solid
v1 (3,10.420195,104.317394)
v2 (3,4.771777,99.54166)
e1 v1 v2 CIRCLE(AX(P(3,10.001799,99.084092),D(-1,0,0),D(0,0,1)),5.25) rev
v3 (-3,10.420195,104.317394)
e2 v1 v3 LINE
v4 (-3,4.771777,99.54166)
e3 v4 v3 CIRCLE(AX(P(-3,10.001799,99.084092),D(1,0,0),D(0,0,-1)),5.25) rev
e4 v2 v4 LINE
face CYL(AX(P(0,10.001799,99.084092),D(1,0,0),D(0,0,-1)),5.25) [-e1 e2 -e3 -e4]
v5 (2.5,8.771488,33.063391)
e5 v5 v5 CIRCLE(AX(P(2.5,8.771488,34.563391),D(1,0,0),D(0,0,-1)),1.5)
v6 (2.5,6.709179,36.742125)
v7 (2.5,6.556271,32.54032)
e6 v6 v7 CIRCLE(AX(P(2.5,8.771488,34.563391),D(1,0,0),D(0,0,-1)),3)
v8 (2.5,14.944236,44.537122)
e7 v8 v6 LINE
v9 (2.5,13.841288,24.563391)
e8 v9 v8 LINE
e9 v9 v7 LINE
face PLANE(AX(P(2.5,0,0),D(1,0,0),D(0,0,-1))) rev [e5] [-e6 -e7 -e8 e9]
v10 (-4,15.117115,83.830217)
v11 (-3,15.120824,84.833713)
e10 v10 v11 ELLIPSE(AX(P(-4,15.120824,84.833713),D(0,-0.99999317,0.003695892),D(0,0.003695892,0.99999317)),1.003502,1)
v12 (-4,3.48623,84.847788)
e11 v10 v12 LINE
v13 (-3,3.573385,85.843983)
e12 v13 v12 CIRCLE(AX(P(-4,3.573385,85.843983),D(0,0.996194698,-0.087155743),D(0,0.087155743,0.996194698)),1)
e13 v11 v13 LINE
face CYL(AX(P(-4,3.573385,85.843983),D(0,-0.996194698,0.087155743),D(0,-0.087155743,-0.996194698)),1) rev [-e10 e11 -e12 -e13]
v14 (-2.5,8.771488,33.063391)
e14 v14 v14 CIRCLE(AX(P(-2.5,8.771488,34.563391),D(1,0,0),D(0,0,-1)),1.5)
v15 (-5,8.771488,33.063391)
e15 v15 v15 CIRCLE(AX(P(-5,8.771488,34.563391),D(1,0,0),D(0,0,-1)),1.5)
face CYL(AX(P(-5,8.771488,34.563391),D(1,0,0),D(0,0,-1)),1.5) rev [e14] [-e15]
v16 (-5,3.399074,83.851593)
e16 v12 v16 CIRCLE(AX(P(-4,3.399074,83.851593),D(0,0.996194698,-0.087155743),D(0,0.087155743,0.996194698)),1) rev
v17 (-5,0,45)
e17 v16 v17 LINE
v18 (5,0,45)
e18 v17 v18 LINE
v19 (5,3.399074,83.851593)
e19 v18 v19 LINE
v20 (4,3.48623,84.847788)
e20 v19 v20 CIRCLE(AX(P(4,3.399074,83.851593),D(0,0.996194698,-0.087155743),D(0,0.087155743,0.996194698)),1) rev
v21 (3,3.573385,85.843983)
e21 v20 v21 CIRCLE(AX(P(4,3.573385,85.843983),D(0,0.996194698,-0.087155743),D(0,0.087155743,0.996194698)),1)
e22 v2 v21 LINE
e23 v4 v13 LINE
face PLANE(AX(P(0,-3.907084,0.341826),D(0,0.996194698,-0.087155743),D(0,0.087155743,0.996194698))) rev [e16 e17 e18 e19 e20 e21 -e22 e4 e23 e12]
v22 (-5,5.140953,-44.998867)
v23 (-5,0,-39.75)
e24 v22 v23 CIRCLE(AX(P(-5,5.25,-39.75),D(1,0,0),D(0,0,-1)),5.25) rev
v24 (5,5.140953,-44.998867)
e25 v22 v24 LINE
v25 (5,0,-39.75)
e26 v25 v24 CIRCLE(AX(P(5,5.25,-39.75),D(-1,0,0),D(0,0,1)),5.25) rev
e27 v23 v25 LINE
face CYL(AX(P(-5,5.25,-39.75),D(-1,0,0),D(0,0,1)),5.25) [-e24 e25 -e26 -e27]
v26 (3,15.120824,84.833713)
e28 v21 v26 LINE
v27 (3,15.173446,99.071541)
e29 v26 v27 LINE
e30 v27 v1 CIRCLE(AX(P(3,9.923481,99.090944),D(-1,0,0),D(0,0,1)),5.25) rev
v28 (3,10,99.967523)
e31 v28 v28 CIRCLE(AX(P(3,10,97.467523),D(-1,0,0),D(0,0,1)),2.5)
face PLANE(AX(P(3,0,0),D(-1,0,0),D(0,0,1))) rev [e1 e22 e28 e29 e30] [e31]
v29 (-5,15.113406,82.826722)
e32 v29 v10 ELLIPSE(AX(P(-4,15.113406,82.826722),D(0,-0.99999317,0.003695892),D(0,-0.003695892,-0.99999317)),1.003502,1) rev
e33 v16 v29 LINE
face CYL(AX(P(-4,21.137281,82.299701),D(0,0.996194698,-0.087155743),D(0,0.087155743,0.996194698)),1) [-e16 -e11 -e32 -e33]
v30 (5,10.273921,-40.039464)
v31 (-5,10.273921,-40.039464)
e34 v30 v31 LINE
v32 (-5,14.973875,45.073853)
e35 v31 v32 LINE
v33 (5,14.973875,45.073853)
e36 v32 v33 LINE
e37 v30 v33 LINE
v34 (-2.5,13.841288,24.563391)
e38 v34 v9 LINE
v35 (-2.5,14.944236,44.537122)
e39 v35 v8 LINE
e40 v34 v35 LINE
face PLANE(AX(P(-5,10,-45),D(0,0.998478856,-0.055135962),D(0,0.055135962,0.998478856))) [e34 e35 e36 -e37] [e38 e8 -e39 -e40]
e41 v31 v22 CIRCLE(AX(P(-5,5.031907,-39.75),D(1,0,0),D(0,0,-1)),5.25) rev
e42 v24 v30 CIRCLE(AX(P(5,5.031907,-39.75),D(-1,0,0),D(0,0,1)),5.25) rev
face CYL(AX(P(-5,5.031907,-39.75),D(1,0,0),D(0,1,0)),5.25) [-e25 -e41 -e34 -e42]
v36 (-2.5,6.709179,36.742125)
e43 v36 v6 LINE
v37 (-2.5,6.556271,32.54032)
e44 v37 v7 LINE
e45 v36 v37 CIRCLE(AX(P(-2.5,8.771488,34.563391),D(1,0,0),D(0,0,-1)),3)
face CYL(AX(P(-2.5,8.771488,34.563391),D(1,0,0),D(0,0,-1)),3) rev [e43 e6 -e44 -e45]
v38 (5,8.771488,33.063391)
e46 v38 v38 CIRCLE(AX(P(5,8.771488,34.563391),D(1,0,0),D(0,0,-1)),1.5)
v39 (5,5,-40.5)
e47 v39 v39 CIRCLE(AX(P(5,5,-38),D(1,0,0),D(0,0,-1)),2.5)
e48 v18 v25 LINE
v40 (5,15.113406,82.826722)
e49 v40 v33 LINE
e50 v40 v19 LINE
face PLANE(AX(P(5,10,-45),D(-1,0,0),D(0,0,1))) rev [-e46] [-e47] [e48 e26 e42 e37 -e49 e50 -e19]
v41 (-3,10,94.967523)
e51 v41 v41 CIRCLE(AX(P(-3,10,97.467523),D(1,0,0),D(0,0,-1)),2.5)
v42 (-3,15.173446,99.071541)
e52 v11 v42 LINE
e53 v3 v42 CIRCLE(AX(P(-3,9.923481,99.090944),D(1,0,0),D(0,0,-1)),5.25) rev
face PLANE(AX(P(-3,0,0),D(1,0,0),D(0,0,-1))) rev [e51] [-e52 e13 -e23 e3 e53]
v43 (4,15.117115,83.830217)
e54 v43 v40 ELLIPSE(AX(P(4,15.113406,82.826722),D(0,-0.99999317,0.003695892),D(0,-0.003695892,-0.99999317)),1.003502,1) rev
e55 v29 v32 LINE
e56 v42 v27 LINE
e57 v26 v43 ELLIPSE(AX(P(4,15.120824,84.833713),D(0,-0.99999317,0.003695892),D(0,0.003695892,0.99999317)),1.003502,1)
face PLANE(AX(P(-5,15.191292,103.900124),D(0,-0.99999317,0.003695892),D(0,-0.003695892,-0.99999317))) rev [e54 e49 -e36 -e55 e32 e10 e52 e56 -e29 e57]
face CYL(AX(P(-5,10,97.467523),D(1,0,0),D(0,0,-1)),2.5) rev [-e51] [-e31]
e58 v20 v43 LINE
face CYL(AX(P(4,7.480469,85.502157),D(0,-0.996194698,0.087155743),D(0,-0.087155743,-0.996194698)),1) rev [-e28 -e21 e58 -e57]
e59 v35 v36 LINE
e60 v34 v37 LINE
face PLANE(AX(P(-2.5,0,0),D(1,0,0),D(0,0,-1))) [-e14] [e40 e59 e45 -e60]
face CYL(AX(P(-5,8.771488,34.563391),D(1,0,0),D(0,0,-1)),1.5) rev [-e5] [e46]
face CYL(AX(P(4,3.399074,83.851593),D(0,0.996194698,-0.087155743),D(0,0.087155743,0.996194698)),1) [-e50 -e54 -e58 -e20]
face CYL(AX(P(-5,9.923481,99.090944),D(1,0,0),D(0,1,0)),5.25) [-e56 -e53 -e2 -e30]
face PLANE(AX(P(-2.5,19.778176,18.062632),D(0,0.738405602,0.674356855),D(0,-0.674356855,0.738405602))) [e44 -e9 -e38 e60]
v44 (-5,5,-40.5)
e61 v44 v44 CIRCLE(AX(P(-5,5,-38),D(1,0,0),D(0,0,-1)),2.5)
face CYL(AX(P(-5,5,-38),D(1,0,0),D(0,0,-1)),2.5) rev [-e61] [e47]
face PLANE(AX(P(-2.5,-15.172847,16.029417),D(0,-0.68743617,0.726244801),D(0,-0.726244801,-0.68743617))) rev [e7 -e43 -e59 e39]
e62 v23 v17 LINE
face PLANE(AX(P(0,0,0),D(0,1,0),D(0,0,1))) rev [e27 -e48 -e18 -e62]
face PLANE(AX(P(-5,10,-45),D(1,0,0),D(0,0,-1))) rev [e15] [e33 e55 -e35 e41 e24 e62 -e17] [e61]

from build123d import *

# Parameters (mm, degrees)
SKETCH2_W           = 10
SKETCH2_H           = 90
BOSS_EXTRUDE1_DEPTH = 10
SKETCH3_W           = 10
SKETCH3_H           = 60
BOSS_EXTRUDE2_DEPTH = 10
BOSS_EXTRUDE3_DEPTH = 10
CUT_EXTRUDE5_START  = -8
CUT_EXTRUDE5_DEPTH  = 2
CUT_EXTRUDE6_DEPTH  = 2
SKETCH4_3_R         = 2.5
CUT_EXTRUDE1_DEPTH  = 10
CUT_EXTRUDE2_START  = -2.5
SKETCH4_5_R         = 1.5
CUT_EXTRUDE2_DEPTH  = 5
CUT_EXTRUDE3_DEPTH  = 107.338519192
FILLET3_R           = 5.25
FILLET4_R           = 5.25
SKETCH4_7_R         = 2.5
CUT_EXTRUDE4_DEPTH  = 106.904850242
FILLET5_R           = 1


# Some blends are built 0.0001 mm under size
with BuildPart() as part:
    # Sketch2 → Boss-Extrude1 (new body)
    with BuildSketch(Plane(origin=(0, 0, 0), x_dir=(1, 0, 0), z_dir=(0, 1, 0))):
        Rectangle(SKETCH2_W, SKETCH2_H)
    extrude(amount=BOSS_EXTRUDE1_DEPTH)

    # Sketch3 → Boss-Extrude2 (add)
    with BuildSketch(Plane(origin=(0, -3.907083998, 0.341825557), x_dir=(1, 0, 0), z_dir=(0, -0.9961946980917459, 0.08715574274765504))):
        with Locations((0, 74.828761414)):
            Rectangle(SKETCH3_W, SKETCH3_H)
    extrude(amount=-BOSS_EXTRUDE2_DEPTH)

    # Sketch4 → Boss-Extrude3 (add)
    with BuildSketch(Plane(origin=(5, 0, 0), x_dir=(0, 0, -1), z_dir=(1, 0, 0))):
        Polygon((-103.900124458, 15.191291546), (-44.563390571, 10), (45, 10), (-45.073853215, 14.973874535), align=None)
    extrude(amount=-BOSS_EXTRUDE3_DEPTH)

    # Sketch6 → Cut-Extrude5 (cut)
    with BuildSketch(Plane(origin=(5, 0, 0), x_dir=(0, 0, -1), z_dir=(1, 0, 0)).offset(CUT_EXTRUDE5_START)):
        Polygon((-103.900124458, 15.191291546), (-104.771681886, 5.229344565), (-84.847787924, 3.48622971), (-83.830217328, 15.117114837), align=None)
    extrude(amount=-CUT_EXTRUDE5_DEPTH, mode=Mode.SUBTRACT)

    # Sketch6<2> → Cut-Extrude6 (cut)
    with BuildSketch(Plane(origin=(5, 0, 0), x_dir=(0, 0, -1), z_dir=(1, 0, 0))):
        Polygon((-103.900124458, 15.191291546), (-104.771681886, 5.229344565), (-84.847787924, 3.48622971), (-83.830217328, 15.117114837), align=None)
    extrude(amount=-CUT_EXTRUDE6_DEPTH, mode=Mode.SUBTRACT)

    # Sketch4<3> → Cut-Extrude1 (cut)
    with BuildSketch(Plane(origin=(5, 0, 0), x_dir=(0, 0, -1), z_dir=(1, 0, 0))):
        with Locations((-97.467522719, 10)):
            Circle(SKETCH4_3_R)
    extrude(amount=-CUT_EXTRUDE1_DEPTH, mode=Mode.SUBTRACT)

    # Sketch4<5> → Cut-Extrude2 (cut)
    with BuildSketch(Plane(origin=(5, 0, 0), x_dir=(0, 0, -1), z_dir=(1, 0, 0)).offset(CUT_EXTRUDE2_START)):
        with BuildLine():
            Line((-44.537121893, 14.944236253), (-36.742124975, 6.709179338))
            ThreePointArc((-36.742124975, 6.709179338), (-34.672491645, 5.773472347), (-32.540320007, 6.556271045))
            Line((-32.540320007, 6.556271045), (-24.563390571, 13.841287616))
            Line((-24.563390571, 13.841287616), (-44.537121893, 14.944236253))
        make_face()
        with Locations((-34.563390571, 8.77148785)):
            Circle(SKETCH4_5_R, mode=Mode.SUBTRACT)
    extrude(amount=-CUT_EXTRUDE2_DEPTH, mode=Mode.SUBTRACT)

    # Sketch4<6> → Cut-Extrude3 (cut, through all)
    with BuildSketch(Plane(origin=(5, 0, 0), x_dir=(0, 0, -1), z_dir=(1, 0, 0))):
        with BuildLine():
            ThreePointArc((-33.702717638, 10), (-34.563390571, 10.27148785), (-35.424063503, 10))
            Line((-35.424063503, 10), (-33.702717638, 10))
        make_face()
        with BuildLine():
            Line((-33.702717638, 10), (-35.424063503, 10))
            ThreePointArc((-35.424063503, 10), (-35.255846563, 7.440884716), (-33.063390571, 8.77148785))
            ThreePointArc((-33.063390571, 8.77148785), (-33.232787437, 9.463943842), (-33.702717638, 10))
        make_face()
    extrude(amount=-CUT_EXTRUDE3_DEPTH, mode=Mode.SUBTRACT)

    # Fillet3
    # the kernel refuses this fillet: 5.25 mm, written as the material it takes off along each edge
    with BuildSketch(Plane(origin=(16.125, 5.229344565, 104.771681886), x_dir=(0, -0.08715574274765522, -0.9961946980917458), z_dir=(-1, 0, 0))) as fillet3_piece_1:
        with BuildLine():
            CenterArc((FILLET3_R, -FILLET3_R), FILLET3_R, 90, 90)
            Line((0, -FILLET3_R), (0, 0))
            Line((0, 0), (FILLET3_R, 0))
        make_face()
    extrude(amount=32.25, mode=Mode.SUBTRACT)
    with BuildSketch(Plane(origin=(15.07154221, 15.191291546, 103.900124458), x_dir=(0, -0.003695891671652919, -0.9999931701690523), z_dir=(-1, 0, 0))) as fillet3_piece_2:
        with BuildLine():
            CenterArc((FILLET3_R * 0.91973654932, FILLET3_R), FILLET3_R, 184.788240524, 85.211759476)
            Line((-FILLET3_R * 0.0767734631138, FILLET3_R * 0.916526680199), (0, 0))
            Line((0, 0), (FILLET3_R * 0.91973654932, 0))
        make_face()
    extrude(amount=30.14308442, mode=Mode.SUBTRACT)

    # Fillet4
    # the kernel refuses this fillet: 5.25 mm, written as the material it takes off along each edge
    with BuildSketch(Plane(origin=(-18.125, 0, -45), x_dir=(0, 1, 0), z_dir=(1, 0, 0))) as fillet4_piece_1:
        with BuildLine():
            CenterArc((FILLET4_R, FILLET4_R), FILLET4_R, 180, 90)
            Line((0, FILLET4_R), (0, 0))
            Line((0, 0), (FILLET4_R, 0))
        make_face()
    extrude(amount=36.25, mode=Mode.SUBTRACT)
    with BuildSketch(Plane(origin=(-17.420233463, 10, -45), x_dir=(0, -1, 0), z_dir=(1, 0, 0))) as fillet4_piece_2:
        with BuildLine():
            CenterArc((FILLET4_R * 0.946303501909, -FILLET4_R), FILLET4_R, 90, 86.839339304)
            Line((-FILLET4_R * 0.0521753539947, -FILLET4_R * 0.944864037923), (0, 0))
            Line((0, 0), (FILLET4_R * 0.946303501909, 0))
        make_face()
    extrude(amount=34.840466925, mode=Mode.SUBTRACT)

    # Sketch4<7> → Cut-Extrude4 (cut, through all)
    with BuildSketch(Plane(origin=(5, 0, 0), x_dir=(0, 0, -1), z_dir=(1, 0, 0))):
        with Locations((38, 5)):
            Circle(SKETCH4_7_R)
    extrude(amount=-CUT_EXTRUDE4_DEPTH, mode=Mode.SUBTRACT)

    # Fillet5
    fillet5_edges = [part.edges().sort_by_distance(p)[0] for p in [
        (-3, 9.301672273, 84.339002626),
        (-5, 9.301672273, 84.339002626),
        (3, 9.301672273, 84.339002626),
        (5, 9.301672273, 84.339002626),
    ]]
    fillet(fillet5_edges, radius=FILLET5_R - 0.0001)  # a hair under: the kernel refuses the full size


solid = part.part
